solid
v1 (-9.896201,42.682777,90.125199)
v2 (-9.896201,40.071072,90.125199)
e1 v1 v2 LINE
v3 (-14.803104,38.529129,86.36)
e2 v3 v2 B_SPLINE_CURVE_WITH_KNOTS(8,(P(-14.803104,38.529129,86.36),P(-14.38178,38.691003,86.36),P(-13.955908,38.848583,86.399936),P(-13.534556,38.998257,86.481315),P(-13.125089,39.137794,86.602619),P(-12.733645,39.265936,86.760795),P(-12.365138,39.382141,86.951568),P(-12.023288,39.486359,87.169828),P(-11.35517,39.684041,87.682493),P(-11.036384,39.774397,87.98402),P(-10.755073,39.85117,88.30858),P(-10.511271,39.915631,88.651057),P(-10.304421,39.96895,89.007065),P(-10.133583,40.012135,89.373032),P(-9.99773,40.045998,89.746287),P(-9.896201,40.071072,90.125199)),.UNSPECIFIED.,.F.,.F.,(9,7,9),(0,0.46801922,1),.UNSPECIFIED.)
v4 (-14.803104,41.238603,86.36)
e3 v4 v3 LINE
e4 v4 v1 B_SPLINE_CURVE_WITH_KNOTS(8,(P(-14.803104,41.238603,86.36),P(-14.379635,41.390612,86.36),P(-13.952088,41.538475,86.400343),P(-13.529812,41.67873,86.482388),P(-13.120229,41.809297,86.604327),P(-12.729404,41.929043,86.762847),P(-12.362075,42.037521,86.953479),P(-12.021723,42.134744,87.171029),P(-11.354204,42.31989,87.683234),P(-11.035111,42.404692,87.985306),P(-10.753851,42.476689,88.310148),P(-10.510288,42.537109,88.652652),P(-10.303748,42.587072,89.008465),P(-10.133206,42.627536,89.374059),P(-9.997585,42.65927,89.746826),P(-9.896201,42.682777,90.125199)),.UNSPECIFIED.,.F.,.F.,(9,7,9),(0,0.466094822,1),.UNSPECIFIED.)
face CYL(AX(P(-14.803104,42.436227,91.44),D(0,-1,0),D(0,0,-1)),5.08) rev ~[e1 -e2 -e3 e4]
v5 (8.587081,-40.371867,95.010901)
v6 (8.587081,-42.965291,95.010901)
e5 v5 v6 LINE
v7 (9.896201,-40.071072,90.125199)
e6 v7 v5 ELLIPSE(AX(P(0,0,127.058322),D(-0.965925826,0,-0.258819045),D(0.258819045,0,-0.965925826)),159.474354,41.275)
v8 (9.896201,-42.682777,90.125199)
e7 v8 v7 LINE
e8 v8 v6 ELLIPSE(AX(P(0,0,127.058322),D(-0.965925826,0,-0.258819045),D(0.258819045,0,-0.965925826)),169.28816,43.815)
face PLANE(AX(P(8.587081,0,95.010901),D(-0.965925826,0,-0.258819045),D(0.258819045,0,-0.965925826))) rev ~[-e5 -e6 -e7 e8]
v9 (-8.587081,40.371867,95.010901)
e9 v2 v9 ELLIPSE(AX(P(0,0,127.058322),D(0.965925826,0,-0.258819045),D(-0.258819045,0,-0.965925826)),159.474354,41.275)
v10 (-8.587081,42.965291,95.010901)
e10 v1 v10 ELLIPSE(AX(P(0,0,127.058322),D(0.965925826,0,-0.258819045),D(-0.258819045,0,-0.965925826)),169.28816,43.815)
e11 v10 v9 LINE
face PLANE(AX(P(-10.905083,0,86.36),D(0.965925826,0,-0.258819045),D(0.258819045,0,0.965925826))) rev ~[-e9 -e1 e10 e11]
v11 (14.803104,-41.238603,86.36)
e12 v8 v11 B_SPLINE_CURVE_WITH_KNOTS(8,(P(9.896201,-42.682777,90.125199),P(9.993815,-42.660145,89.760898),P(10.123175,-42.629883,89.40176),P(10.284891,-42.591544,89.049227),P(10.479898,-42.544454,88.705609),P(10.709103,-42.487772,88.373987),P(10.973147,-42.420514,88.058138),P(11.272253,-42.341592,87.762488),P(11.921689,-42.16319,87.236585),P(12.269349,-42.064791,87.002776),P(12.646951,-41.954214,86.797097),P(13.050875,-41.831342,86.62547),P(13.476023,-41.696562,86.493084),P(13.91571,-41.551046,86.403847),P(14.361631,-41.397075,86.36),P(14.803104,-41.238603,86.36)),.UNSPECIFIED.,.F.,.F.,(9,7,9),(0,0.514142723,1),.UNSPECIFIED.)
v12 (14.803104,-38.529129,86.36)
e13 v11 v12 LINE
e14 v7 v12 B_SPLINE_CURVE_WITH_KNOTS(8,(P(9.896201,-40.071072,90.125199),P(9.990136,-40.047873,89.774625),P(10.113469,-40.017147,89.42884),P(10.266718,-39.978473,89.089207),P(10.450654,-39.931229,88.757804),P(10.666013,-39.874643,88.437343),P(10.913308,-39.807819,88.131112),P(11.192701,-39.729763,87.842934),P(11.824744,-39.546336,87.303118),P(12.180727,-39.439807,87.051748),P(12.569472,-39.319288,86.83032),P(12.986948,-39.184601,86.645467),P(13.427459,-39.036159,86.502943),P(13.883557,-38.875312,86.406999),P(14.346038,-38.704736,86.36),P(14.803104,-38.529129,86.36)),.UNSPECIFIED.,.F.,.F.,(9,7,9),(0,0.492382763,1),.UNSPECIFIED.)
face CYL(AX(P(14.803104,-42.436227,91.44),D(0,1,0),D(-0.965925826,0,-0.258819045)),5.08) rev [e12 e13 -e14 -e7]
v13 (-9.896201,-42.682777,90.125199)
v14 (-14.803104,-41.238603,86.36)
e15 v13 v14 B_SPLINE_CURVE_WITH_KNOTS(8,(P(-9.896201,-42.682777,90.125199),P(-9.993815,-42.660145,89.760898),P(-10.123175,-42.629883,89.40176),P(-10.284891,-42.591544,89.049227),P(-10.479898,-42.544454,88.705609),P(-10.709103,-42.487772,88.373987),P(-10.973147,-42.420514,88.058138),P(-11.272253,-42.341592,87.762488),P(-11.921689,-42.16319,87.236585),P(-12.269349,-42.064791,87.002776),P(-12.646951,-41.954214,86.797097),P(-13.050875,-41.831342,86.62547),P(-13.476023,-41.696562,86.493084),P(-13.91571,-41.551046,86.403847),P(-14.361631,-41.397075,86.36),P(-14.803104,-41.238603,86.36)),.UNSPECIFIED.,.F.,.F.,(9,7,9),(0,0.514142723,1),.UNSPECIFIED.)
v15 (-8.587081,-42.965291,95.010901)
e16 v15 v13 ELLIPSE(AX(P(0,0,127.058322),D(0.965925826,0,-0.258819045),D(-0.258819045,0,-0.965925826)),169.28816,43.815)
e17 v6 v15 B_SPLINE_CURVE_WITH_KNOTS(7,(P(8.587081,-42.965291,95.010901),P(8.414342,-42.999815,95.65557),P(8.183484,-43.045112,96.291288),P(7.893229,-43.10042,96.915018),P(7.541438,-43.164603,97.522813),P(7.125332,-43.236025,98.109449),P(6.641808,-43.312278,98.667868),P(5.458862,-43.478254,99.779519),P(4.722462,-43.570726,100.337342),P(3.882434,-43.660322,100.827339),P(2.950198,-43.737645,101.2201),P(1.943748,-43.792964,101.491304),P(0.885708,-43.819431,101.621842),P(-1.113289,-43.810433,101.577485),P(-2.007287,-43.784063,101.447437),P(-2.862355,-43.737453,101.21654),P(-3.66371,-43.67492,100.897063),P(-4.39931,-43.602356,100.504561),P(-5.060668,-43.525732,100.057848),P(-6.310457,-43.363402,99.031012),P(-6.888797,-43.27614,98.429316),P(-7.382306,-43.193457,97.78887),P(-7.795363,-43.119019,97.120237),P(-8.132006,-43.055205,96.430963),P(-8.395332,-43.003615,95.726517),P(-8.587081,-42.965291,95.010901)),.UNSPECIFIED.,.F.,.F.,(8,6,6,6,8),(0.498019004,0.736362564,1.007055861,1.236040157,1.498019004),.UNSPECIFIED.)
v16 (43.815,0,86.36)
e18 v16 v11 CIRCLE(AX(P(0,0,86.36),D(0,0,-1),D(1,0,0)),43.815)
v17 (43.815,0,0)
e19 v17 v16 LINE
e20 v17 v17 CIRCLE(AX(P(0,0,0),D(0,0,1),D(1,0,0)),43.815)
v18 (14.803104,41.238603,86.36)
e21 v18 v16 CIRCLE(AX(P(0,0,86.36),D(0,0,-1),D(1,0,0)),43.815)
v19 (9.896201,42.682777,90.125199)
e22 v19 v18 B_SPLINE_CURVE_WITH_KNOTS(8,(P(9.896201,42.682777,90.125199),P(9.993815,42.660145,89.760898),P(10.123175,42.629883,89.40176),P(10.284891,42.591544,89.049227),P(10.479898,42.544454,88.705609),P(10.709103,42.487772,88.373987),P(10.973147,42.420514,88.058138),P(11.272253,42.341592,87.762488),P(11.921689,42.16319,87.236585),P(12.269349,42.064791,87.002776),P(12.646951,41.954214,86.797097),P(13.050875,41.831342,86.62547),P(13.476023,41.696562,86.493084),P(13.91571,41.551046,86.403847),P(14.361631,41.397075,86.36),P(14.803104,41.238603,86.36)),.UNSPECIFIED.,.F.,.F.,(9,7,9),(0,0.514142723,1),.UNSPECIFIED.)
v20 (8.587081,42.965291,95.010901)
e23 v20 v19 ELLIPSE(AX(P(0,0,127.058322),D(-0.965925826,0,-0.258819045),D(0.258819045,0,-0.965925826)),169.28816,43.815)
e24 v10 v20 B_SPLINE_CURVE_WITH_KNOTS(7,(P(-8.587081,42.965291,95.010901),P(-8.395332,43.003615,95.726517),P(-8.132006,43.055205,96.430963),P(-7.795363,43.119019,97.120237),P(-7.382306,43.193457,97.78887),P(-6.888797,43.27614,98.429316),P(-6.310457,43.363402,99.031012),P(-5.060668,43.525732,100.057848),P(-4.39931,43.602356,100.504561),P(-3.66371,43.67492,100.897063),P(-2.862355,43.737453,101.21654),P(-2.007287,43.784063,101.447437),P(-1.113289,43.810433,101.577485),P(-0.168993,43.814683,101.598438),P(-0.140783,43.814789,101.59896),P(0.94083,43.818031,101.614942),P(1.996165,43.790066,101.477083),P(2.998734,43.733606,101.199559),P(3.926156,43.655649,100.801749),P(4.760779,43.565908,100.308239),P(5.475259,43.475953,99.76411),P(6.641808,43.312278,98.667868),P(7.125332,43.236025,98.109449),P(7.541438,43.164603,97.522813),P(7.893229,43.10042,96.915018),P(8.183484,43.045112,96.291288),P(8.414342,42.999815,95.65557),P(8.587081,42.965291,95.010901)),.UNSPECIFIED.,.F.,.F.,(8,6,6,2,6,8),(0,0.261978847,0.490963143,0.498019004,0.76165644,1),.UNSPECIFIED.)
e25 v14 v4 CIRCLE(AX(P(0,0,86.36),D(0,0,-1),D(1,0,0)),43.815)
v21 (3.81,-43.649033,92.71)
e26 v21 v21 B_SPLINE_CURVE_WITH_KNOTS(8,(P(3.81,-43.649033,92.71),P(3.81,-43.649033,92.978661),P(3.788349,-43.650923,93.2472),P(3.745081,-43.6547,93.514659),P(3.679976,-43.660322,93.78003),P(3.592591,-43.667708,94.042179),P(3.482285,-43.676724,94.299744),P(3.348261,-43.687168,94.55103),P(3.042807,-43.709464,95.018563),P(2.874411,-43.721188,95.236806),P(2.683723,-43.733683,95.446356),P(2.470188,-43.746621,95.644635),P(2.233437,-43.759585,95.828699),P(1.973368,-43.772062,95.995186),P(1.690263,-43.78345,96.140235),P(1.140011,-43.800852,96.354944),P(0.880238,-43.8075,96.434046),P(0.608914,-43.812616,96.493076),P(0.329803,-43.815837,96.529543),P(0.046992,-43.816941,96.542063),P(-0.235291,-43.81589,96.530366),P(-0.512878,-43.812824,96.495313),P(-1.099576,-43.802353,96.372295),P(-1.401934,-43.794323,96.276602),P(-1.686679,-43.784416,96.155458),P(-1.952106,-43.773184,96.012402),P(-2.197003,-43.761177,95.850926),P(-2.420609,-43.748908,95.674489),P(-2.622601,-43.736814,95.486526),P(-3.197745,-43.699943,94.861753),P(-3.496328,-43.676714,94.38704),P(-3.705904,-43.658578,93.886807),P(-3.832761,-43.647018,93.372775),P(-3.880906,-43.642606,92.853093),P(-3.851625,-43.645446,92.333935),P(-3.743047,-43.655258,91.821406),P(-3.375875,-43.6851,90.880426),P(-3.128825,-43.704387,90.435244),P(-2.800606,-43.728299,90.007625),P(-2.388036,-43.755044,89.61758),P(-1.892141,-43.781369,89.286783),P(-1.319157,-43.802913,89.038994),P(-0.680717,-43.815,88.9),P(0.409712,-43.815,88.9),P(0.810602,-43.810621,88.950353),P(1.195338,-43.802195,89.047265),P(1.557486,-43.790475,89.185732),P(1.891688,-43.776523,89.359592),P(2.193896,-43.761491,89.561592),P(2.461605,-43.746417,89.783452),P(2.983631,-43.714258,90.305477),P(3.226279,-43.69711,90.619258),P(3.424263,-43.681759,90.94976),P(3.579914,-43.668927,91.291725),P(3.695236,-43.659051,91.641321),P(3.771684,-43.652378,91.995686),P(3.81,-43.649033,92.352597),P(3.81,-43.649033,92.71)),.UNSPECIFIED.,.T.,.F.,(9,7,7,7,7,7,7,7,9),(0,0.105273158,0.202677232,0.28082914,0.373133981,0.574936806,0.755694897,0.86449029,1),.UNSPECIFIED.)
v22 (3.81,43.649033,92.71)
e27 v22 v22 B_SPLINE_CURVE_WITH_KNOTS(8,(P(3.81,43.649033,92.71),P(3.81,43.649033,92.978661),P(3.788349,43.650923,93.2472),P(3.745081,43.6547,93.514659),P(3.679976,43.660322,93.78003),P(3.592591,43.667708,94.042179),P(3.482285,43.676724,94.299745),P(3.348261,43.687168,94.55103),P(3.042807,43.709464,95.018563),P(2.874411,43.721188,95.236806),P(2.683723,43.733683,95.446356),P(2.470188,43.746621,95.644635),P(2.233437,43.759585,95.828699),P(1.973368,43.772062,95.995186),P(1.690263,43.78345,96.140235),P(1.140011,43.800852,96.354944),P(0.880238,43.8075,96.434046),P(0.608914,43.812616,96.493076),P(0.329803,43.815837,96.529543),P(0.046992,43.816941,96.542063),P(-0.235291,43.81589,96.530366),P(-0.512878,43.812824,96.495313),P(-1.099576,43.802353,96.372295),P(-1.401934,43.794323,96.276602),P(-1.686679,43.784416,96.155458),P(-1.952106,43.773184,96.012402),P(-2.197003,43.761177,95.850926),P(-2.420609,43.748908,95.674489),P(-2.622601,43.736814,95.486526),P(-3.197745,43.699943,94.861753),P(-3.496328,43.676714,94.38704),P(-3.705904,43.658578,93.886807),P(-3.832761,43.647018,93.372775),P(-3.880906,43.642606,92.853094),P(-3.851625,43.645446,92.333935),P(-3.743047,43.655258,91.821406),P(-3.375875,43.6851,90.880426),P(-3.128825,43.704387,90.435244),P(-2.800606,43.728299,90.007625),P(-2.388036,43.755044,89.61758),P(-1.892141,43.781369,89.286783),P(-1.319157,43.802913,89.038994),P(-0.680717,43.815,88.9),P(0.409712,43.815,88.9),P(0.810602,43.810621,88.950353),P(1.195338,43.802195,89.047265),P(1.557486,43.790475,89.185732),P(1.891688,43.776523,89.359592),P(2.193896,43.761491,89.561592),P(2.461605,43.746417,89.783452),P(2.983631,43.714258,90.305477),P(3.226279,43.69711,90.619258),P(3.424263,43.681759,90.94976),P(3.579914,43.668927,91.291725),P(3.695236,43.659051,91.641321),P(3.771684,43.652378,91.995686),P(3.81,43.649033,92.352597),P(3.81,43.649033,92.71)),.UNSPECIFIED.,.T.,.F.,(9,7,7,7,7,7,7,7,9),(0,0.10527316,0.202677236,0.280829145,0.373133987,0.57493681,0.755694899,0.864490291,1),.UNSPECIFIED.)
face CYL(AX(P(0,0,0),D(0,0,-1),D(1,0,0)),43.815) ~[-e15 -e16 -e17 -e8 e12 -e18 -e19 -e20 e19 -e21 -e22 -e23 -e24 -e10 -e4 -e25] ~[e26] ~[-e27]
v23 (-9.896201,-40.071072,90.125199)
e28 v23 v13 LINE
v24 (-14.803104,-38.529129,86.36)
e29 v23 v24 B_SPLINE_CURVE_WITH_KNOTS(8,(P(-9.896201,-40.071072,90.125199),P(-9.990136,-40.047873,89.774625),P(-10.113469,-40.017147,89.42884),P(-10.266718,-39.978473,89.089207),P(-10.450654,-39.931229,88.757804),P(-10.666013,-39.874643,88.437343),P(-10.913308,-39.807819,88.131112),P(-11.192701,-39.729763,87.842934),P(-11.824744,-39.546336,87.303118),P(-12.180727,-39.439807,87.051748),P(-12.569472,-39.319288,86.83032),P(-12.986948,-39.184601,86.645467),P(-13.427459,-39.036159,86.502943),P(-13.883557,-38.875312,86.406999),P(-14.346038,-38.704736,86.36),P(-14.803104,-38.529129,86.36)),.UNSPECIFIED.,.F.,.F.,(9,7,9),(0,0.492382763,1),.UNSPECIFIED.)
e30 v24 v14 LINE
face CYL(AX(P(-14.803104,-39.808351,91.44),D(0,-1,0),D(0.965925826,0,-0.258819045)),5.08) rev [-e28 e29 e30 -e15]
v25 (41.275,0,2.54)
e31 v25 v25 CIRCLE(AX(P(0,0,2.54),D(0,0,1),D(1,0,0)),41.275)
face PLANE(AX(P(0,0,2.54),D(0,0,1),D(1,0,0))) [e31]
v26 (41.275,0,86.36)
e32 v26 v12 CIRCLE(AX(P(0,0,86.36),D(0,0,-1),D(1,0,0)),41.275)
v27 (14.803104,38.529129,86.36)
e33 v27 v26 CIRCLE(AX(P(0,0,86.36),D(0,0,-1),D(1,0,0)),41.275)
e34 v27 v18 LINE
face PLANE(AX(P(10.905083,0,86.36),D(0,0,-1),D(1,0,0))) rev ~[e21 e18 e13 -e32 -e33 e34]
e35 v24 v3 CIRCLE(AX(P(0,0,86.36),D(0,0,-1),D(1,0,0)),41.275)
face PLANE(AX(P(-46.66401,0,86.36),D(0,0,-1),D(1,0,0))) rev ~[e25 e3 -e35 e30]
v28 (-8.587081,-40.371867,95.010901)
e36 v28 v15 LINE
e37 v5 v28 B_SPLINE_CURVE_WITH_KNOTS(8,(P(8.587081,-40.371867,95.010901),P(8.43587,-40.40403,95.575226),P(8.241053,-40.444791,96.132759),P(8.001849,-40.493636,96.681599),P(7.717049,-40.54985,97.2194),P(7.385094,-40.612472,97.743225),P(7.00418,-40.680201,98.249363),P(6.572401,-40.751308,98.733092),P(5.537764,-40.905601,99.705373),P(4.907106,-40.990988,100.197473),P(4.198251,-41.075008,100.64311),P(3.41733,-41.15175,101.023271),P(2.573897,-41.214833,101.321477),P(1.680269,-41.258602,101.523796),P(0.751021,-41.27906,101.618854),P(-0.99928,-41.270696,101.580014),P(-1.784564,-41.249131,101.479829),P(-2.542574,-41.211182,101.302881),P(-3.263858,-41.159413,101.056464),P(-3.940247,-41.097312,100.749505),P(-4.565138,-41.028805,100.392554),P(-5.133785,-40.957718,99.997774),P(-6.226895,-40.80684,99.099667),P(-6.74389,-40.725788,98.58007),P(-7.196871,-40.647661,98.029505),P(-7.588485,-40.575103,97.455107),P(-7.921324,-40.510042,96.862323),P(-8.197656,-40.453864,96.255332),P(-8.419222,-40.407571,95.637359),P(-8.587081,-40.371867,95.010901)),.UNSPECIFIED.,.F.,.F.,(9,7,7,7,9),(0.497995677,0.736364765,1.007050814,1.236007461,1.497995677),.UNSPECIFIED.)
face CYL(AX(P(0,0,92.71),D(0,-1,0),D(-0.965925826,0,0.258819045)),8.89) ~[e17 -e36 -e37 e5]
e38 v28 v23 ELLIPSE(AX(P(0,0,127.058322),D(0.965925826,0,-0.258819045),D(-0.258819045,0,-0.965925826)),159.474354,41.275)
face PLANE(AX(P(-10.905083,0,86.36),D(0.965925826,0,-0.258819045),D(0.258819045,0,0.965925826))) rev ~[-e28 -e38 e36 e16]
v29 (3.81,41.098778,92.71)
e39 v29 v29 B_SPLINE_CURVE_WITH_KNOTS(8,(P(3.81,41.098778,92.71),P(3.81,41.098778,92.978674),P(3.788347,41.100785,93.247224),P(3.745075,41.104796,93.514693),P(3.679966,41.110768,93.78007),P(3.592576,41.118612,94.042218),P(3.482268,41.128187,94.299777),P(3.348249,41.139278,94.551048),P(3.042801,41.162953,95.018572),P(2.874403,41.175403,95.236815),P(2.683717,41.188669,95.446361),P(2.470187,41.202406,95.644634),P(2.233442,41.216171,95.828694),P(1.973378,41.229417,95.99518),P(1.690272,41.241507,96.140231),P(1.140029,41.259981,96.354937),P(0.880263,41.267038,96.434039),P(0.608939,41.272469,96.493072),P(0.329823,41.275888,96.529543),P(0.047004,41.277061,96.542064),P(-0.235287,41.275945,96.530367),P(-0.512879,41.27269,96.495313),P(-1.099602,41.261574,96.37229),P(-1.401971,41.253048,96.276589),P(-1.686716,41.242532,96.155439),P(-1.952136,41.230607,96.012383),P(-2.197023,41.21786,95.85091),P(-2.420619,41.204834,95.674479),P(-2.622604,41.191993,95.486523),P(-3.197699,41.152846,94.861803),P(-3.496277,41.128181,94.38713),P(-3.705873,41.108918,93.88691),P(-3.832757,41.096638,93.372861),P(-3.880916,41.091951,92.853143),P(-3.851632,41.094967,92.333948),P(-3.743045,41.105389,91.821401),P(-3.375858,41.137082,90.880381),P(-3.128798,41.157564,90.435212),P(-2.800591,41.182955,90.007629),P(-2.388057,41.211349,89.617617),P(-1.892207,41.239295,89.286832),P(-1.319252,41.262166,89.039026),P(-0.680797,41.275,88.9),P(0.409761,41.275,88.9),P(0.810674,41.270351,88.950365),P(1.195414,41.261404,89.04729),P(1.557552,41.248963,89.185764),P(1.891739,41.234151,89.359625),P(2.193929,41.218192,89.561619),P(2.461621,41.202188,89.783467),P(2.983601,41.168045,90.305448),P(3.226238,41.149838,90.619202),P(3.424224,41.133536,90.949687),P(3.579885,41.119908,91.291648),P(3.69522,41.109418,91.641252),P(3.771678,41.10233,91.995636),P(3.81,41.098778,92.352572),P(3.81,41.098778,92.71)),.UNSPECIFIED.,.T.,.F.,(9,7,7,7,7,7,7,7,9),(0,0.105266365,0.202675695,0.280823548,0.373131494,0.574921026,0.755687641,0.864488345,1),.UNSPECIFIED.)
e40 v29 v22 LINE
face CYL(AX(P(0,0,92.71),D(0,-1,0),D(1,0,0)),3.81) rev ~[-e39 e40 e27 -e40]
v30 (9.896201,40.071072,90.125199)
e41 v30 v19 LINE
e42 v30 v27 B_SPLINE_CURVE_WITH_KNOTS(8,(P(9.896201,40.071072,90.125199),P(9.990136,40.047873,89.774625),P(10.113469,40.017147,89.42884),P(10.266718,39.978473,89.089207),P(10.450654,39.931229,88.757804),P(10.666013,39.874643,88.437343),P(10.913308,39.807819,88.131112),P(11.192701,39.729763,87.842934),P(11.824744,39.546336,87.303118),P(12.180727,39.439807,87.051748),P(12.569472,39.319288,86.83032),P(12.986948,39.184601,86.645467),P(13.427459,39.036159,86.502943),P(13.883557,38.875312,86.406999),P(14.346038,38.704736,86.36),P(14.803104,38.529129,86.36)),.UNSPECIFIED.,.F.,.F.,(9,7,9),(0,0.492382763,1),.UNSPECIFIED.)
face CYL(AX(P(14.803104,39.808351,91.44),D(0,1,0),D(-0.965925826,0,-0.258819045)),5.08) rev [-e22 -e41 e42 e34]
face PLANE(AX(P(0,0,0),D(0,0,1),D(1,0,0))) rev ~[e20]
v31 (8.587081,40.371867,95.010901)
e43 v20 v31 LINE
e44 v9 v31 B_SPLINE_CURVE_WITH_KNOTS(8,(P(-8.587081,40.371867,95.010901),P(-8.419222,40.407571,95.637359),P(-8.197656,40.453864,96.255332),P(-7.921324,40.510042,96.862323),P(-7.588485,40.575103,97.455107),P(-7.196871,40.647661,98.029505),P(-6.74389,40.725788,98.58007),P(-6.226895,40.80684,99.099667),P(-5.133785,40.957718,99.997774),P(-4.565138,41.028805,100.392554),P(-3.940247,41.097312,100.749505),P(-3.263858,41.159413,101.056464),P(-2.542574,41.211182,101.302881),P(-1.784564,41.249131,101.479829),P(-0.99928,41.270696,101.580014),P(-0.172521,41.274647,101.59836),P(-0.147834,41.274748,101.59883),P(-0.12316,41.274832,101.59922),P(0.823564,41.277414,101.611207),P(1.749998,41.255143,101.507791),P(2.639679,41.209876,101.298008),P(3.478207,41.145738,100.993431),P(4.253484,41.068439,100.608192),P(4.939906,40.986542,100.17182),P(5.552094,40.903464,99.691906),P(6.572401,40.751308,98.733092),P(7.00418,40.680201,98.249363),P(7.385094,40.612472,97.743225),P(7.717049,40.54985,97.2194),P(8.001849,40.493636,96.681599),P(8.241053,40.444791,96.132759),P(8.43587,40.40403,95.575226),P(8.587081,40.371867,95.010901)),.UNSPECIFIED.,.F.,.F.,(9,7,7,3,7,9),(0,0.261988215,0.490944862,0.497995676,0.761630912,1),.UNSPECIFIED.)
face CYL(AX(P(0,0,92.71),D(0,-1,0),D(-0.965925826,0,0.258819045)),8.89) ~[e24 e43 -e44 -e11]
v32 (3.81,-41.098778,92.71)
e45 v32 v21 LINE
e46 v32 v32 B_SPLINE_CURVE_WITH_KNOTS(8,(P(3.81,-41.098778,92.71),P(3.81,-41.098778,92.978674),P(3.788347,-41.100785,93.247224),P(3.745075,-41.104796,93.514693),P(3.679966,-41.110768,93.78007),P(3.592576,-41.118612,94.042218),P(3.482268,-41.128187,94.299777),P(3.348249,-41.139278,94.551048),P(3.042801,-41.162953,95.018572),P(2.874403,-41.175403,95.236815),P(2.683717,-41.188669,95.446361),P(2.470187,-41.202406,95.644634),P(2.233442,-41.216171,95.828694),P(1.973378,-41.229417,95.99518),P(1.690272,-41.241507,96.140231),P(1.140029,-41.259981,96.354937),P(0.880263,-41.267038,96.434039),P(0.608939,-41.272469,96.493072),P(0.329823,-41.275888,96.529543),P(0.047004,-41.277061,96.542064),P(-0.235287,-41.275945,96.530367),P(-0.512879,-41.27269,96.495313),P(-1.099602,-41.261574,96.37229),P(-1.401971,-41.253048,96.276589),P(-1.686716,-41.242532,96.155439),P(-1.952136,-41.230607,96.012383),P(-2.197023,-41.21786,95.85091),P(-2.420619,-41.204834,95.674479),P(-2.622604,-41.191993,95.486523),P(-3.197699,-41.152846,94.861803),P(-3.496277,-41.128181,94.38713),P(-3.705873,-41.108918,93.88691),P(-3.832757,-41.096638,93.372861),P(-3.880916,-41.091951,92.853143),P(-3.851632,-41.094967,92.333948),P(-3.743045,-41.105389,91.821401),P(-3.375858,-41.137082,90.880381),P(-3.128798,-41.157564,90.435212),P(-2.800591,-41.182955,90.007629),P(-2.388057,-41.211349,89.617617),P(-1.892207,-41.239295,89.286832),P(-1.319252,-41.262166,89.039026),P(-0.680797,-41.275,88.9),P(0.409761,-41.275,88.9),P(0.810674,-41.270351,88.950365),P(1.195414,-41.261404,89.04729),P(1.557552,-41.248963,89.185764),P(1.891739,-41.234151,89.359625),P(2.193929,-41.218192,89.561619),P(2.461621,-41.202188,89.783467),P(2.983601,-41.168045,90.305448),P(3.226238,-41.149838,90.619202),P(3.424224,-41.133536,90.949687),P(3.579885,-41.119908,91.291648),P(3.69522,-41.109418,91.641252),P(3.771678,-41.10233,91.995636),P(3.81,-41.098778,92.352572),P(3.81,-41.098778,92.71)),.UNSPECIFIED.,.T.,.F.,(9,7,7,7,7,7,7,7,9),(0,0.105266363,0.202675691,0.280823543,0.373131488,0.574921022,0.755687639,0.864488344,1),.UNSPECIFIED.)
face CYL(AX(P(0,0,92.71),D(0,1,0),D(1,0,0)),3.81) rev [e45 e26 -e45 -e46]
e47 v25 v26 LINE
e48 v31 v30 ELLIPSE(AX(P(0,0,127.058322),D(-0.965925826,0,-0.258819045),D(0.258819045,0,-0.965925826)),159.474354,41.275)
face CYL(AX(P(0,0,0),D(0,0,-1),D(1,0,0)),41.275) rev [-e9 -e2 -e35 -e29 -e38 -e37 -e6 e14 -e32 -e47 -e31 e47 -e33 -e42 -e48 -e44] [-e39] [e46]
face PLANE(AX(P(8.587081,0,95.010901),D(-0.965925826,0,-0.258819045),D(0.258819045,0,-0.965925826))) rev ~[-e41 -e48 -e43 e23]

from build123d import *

# Parameters (mm, degrees)
F1_R     = 43.815
F1_R_2   = 41.275
F2_DEPTH = 101.6
F3_DEPTH = 2.54
F4_R     = 3.81
F5_DEPTH = 57.658
F6_R     = 5.08


# Not quite as in the source:
# - a variable given as a bare number and used for a length is read in inches; the dataset says mm whatever the document's units were


with BuildPart() as f2:
    # F1 (on Top) → F2 (new body)
    with BuildSketch(Plane.XY):
        Circle(F1_R)
        Circle(F1_R_2, mode=Mode.SUBTRACT)
    extrude(amount=F2_DEPTH)

    # F1 (on Top) → F3 (join)
    with BuildSketch(Plane.XY):
        Circle(F1_R_2)
    extrude(amount=F3_DEPTH)

    # F4 (on Front) → F5 (cut, symmetric)
    with BuildSketch(Plane.XZ):
        with Locations((0, 92.71)):
            Circle(F4_R)
        with BuildLine():
            Line((46.664010312, 104.1751918972), (-46.664010312, 104.1751918972))
            Line((-46.664010312, 104.1751918972), (-46.664010312, 86.36))
            Line((-46.664010312, 86.36), (-10.9050826158, 86.36))
            Line((-10.9050826158, 86.36), (-8.5870805957, 95.010901311))
            ThreePointArc((-8.5870805957, 95.010901311), (0, 101.6), (8.5870805957, 95.010901311))
            Line((8.5870805957, 95.010901311), (10.9050826158, 86.36))
            Line((10.9050826158, 86.36), (46.664010312, 86.36))
            Line((46.664010312, 86.36), (46.664010312, 104.1751918972))
        make_face()
    extrude(amount=F5_DEPTH, both=True, mode=Mode.SUBTRACT)

    # F6
    f6_edges = [f2.edges().sort_by_distance(p)[0] for p in [
        (10.905083, -41.122289, 86.36),
        (10.905083, 41.122289, 86.36),
        (-10.905083, -41.122289, 86.36),
        (-10.905083, 41.122289, 86.36),
    ]]
    fillet(f6_edges, radius=F6_R)


solid = f2.part
